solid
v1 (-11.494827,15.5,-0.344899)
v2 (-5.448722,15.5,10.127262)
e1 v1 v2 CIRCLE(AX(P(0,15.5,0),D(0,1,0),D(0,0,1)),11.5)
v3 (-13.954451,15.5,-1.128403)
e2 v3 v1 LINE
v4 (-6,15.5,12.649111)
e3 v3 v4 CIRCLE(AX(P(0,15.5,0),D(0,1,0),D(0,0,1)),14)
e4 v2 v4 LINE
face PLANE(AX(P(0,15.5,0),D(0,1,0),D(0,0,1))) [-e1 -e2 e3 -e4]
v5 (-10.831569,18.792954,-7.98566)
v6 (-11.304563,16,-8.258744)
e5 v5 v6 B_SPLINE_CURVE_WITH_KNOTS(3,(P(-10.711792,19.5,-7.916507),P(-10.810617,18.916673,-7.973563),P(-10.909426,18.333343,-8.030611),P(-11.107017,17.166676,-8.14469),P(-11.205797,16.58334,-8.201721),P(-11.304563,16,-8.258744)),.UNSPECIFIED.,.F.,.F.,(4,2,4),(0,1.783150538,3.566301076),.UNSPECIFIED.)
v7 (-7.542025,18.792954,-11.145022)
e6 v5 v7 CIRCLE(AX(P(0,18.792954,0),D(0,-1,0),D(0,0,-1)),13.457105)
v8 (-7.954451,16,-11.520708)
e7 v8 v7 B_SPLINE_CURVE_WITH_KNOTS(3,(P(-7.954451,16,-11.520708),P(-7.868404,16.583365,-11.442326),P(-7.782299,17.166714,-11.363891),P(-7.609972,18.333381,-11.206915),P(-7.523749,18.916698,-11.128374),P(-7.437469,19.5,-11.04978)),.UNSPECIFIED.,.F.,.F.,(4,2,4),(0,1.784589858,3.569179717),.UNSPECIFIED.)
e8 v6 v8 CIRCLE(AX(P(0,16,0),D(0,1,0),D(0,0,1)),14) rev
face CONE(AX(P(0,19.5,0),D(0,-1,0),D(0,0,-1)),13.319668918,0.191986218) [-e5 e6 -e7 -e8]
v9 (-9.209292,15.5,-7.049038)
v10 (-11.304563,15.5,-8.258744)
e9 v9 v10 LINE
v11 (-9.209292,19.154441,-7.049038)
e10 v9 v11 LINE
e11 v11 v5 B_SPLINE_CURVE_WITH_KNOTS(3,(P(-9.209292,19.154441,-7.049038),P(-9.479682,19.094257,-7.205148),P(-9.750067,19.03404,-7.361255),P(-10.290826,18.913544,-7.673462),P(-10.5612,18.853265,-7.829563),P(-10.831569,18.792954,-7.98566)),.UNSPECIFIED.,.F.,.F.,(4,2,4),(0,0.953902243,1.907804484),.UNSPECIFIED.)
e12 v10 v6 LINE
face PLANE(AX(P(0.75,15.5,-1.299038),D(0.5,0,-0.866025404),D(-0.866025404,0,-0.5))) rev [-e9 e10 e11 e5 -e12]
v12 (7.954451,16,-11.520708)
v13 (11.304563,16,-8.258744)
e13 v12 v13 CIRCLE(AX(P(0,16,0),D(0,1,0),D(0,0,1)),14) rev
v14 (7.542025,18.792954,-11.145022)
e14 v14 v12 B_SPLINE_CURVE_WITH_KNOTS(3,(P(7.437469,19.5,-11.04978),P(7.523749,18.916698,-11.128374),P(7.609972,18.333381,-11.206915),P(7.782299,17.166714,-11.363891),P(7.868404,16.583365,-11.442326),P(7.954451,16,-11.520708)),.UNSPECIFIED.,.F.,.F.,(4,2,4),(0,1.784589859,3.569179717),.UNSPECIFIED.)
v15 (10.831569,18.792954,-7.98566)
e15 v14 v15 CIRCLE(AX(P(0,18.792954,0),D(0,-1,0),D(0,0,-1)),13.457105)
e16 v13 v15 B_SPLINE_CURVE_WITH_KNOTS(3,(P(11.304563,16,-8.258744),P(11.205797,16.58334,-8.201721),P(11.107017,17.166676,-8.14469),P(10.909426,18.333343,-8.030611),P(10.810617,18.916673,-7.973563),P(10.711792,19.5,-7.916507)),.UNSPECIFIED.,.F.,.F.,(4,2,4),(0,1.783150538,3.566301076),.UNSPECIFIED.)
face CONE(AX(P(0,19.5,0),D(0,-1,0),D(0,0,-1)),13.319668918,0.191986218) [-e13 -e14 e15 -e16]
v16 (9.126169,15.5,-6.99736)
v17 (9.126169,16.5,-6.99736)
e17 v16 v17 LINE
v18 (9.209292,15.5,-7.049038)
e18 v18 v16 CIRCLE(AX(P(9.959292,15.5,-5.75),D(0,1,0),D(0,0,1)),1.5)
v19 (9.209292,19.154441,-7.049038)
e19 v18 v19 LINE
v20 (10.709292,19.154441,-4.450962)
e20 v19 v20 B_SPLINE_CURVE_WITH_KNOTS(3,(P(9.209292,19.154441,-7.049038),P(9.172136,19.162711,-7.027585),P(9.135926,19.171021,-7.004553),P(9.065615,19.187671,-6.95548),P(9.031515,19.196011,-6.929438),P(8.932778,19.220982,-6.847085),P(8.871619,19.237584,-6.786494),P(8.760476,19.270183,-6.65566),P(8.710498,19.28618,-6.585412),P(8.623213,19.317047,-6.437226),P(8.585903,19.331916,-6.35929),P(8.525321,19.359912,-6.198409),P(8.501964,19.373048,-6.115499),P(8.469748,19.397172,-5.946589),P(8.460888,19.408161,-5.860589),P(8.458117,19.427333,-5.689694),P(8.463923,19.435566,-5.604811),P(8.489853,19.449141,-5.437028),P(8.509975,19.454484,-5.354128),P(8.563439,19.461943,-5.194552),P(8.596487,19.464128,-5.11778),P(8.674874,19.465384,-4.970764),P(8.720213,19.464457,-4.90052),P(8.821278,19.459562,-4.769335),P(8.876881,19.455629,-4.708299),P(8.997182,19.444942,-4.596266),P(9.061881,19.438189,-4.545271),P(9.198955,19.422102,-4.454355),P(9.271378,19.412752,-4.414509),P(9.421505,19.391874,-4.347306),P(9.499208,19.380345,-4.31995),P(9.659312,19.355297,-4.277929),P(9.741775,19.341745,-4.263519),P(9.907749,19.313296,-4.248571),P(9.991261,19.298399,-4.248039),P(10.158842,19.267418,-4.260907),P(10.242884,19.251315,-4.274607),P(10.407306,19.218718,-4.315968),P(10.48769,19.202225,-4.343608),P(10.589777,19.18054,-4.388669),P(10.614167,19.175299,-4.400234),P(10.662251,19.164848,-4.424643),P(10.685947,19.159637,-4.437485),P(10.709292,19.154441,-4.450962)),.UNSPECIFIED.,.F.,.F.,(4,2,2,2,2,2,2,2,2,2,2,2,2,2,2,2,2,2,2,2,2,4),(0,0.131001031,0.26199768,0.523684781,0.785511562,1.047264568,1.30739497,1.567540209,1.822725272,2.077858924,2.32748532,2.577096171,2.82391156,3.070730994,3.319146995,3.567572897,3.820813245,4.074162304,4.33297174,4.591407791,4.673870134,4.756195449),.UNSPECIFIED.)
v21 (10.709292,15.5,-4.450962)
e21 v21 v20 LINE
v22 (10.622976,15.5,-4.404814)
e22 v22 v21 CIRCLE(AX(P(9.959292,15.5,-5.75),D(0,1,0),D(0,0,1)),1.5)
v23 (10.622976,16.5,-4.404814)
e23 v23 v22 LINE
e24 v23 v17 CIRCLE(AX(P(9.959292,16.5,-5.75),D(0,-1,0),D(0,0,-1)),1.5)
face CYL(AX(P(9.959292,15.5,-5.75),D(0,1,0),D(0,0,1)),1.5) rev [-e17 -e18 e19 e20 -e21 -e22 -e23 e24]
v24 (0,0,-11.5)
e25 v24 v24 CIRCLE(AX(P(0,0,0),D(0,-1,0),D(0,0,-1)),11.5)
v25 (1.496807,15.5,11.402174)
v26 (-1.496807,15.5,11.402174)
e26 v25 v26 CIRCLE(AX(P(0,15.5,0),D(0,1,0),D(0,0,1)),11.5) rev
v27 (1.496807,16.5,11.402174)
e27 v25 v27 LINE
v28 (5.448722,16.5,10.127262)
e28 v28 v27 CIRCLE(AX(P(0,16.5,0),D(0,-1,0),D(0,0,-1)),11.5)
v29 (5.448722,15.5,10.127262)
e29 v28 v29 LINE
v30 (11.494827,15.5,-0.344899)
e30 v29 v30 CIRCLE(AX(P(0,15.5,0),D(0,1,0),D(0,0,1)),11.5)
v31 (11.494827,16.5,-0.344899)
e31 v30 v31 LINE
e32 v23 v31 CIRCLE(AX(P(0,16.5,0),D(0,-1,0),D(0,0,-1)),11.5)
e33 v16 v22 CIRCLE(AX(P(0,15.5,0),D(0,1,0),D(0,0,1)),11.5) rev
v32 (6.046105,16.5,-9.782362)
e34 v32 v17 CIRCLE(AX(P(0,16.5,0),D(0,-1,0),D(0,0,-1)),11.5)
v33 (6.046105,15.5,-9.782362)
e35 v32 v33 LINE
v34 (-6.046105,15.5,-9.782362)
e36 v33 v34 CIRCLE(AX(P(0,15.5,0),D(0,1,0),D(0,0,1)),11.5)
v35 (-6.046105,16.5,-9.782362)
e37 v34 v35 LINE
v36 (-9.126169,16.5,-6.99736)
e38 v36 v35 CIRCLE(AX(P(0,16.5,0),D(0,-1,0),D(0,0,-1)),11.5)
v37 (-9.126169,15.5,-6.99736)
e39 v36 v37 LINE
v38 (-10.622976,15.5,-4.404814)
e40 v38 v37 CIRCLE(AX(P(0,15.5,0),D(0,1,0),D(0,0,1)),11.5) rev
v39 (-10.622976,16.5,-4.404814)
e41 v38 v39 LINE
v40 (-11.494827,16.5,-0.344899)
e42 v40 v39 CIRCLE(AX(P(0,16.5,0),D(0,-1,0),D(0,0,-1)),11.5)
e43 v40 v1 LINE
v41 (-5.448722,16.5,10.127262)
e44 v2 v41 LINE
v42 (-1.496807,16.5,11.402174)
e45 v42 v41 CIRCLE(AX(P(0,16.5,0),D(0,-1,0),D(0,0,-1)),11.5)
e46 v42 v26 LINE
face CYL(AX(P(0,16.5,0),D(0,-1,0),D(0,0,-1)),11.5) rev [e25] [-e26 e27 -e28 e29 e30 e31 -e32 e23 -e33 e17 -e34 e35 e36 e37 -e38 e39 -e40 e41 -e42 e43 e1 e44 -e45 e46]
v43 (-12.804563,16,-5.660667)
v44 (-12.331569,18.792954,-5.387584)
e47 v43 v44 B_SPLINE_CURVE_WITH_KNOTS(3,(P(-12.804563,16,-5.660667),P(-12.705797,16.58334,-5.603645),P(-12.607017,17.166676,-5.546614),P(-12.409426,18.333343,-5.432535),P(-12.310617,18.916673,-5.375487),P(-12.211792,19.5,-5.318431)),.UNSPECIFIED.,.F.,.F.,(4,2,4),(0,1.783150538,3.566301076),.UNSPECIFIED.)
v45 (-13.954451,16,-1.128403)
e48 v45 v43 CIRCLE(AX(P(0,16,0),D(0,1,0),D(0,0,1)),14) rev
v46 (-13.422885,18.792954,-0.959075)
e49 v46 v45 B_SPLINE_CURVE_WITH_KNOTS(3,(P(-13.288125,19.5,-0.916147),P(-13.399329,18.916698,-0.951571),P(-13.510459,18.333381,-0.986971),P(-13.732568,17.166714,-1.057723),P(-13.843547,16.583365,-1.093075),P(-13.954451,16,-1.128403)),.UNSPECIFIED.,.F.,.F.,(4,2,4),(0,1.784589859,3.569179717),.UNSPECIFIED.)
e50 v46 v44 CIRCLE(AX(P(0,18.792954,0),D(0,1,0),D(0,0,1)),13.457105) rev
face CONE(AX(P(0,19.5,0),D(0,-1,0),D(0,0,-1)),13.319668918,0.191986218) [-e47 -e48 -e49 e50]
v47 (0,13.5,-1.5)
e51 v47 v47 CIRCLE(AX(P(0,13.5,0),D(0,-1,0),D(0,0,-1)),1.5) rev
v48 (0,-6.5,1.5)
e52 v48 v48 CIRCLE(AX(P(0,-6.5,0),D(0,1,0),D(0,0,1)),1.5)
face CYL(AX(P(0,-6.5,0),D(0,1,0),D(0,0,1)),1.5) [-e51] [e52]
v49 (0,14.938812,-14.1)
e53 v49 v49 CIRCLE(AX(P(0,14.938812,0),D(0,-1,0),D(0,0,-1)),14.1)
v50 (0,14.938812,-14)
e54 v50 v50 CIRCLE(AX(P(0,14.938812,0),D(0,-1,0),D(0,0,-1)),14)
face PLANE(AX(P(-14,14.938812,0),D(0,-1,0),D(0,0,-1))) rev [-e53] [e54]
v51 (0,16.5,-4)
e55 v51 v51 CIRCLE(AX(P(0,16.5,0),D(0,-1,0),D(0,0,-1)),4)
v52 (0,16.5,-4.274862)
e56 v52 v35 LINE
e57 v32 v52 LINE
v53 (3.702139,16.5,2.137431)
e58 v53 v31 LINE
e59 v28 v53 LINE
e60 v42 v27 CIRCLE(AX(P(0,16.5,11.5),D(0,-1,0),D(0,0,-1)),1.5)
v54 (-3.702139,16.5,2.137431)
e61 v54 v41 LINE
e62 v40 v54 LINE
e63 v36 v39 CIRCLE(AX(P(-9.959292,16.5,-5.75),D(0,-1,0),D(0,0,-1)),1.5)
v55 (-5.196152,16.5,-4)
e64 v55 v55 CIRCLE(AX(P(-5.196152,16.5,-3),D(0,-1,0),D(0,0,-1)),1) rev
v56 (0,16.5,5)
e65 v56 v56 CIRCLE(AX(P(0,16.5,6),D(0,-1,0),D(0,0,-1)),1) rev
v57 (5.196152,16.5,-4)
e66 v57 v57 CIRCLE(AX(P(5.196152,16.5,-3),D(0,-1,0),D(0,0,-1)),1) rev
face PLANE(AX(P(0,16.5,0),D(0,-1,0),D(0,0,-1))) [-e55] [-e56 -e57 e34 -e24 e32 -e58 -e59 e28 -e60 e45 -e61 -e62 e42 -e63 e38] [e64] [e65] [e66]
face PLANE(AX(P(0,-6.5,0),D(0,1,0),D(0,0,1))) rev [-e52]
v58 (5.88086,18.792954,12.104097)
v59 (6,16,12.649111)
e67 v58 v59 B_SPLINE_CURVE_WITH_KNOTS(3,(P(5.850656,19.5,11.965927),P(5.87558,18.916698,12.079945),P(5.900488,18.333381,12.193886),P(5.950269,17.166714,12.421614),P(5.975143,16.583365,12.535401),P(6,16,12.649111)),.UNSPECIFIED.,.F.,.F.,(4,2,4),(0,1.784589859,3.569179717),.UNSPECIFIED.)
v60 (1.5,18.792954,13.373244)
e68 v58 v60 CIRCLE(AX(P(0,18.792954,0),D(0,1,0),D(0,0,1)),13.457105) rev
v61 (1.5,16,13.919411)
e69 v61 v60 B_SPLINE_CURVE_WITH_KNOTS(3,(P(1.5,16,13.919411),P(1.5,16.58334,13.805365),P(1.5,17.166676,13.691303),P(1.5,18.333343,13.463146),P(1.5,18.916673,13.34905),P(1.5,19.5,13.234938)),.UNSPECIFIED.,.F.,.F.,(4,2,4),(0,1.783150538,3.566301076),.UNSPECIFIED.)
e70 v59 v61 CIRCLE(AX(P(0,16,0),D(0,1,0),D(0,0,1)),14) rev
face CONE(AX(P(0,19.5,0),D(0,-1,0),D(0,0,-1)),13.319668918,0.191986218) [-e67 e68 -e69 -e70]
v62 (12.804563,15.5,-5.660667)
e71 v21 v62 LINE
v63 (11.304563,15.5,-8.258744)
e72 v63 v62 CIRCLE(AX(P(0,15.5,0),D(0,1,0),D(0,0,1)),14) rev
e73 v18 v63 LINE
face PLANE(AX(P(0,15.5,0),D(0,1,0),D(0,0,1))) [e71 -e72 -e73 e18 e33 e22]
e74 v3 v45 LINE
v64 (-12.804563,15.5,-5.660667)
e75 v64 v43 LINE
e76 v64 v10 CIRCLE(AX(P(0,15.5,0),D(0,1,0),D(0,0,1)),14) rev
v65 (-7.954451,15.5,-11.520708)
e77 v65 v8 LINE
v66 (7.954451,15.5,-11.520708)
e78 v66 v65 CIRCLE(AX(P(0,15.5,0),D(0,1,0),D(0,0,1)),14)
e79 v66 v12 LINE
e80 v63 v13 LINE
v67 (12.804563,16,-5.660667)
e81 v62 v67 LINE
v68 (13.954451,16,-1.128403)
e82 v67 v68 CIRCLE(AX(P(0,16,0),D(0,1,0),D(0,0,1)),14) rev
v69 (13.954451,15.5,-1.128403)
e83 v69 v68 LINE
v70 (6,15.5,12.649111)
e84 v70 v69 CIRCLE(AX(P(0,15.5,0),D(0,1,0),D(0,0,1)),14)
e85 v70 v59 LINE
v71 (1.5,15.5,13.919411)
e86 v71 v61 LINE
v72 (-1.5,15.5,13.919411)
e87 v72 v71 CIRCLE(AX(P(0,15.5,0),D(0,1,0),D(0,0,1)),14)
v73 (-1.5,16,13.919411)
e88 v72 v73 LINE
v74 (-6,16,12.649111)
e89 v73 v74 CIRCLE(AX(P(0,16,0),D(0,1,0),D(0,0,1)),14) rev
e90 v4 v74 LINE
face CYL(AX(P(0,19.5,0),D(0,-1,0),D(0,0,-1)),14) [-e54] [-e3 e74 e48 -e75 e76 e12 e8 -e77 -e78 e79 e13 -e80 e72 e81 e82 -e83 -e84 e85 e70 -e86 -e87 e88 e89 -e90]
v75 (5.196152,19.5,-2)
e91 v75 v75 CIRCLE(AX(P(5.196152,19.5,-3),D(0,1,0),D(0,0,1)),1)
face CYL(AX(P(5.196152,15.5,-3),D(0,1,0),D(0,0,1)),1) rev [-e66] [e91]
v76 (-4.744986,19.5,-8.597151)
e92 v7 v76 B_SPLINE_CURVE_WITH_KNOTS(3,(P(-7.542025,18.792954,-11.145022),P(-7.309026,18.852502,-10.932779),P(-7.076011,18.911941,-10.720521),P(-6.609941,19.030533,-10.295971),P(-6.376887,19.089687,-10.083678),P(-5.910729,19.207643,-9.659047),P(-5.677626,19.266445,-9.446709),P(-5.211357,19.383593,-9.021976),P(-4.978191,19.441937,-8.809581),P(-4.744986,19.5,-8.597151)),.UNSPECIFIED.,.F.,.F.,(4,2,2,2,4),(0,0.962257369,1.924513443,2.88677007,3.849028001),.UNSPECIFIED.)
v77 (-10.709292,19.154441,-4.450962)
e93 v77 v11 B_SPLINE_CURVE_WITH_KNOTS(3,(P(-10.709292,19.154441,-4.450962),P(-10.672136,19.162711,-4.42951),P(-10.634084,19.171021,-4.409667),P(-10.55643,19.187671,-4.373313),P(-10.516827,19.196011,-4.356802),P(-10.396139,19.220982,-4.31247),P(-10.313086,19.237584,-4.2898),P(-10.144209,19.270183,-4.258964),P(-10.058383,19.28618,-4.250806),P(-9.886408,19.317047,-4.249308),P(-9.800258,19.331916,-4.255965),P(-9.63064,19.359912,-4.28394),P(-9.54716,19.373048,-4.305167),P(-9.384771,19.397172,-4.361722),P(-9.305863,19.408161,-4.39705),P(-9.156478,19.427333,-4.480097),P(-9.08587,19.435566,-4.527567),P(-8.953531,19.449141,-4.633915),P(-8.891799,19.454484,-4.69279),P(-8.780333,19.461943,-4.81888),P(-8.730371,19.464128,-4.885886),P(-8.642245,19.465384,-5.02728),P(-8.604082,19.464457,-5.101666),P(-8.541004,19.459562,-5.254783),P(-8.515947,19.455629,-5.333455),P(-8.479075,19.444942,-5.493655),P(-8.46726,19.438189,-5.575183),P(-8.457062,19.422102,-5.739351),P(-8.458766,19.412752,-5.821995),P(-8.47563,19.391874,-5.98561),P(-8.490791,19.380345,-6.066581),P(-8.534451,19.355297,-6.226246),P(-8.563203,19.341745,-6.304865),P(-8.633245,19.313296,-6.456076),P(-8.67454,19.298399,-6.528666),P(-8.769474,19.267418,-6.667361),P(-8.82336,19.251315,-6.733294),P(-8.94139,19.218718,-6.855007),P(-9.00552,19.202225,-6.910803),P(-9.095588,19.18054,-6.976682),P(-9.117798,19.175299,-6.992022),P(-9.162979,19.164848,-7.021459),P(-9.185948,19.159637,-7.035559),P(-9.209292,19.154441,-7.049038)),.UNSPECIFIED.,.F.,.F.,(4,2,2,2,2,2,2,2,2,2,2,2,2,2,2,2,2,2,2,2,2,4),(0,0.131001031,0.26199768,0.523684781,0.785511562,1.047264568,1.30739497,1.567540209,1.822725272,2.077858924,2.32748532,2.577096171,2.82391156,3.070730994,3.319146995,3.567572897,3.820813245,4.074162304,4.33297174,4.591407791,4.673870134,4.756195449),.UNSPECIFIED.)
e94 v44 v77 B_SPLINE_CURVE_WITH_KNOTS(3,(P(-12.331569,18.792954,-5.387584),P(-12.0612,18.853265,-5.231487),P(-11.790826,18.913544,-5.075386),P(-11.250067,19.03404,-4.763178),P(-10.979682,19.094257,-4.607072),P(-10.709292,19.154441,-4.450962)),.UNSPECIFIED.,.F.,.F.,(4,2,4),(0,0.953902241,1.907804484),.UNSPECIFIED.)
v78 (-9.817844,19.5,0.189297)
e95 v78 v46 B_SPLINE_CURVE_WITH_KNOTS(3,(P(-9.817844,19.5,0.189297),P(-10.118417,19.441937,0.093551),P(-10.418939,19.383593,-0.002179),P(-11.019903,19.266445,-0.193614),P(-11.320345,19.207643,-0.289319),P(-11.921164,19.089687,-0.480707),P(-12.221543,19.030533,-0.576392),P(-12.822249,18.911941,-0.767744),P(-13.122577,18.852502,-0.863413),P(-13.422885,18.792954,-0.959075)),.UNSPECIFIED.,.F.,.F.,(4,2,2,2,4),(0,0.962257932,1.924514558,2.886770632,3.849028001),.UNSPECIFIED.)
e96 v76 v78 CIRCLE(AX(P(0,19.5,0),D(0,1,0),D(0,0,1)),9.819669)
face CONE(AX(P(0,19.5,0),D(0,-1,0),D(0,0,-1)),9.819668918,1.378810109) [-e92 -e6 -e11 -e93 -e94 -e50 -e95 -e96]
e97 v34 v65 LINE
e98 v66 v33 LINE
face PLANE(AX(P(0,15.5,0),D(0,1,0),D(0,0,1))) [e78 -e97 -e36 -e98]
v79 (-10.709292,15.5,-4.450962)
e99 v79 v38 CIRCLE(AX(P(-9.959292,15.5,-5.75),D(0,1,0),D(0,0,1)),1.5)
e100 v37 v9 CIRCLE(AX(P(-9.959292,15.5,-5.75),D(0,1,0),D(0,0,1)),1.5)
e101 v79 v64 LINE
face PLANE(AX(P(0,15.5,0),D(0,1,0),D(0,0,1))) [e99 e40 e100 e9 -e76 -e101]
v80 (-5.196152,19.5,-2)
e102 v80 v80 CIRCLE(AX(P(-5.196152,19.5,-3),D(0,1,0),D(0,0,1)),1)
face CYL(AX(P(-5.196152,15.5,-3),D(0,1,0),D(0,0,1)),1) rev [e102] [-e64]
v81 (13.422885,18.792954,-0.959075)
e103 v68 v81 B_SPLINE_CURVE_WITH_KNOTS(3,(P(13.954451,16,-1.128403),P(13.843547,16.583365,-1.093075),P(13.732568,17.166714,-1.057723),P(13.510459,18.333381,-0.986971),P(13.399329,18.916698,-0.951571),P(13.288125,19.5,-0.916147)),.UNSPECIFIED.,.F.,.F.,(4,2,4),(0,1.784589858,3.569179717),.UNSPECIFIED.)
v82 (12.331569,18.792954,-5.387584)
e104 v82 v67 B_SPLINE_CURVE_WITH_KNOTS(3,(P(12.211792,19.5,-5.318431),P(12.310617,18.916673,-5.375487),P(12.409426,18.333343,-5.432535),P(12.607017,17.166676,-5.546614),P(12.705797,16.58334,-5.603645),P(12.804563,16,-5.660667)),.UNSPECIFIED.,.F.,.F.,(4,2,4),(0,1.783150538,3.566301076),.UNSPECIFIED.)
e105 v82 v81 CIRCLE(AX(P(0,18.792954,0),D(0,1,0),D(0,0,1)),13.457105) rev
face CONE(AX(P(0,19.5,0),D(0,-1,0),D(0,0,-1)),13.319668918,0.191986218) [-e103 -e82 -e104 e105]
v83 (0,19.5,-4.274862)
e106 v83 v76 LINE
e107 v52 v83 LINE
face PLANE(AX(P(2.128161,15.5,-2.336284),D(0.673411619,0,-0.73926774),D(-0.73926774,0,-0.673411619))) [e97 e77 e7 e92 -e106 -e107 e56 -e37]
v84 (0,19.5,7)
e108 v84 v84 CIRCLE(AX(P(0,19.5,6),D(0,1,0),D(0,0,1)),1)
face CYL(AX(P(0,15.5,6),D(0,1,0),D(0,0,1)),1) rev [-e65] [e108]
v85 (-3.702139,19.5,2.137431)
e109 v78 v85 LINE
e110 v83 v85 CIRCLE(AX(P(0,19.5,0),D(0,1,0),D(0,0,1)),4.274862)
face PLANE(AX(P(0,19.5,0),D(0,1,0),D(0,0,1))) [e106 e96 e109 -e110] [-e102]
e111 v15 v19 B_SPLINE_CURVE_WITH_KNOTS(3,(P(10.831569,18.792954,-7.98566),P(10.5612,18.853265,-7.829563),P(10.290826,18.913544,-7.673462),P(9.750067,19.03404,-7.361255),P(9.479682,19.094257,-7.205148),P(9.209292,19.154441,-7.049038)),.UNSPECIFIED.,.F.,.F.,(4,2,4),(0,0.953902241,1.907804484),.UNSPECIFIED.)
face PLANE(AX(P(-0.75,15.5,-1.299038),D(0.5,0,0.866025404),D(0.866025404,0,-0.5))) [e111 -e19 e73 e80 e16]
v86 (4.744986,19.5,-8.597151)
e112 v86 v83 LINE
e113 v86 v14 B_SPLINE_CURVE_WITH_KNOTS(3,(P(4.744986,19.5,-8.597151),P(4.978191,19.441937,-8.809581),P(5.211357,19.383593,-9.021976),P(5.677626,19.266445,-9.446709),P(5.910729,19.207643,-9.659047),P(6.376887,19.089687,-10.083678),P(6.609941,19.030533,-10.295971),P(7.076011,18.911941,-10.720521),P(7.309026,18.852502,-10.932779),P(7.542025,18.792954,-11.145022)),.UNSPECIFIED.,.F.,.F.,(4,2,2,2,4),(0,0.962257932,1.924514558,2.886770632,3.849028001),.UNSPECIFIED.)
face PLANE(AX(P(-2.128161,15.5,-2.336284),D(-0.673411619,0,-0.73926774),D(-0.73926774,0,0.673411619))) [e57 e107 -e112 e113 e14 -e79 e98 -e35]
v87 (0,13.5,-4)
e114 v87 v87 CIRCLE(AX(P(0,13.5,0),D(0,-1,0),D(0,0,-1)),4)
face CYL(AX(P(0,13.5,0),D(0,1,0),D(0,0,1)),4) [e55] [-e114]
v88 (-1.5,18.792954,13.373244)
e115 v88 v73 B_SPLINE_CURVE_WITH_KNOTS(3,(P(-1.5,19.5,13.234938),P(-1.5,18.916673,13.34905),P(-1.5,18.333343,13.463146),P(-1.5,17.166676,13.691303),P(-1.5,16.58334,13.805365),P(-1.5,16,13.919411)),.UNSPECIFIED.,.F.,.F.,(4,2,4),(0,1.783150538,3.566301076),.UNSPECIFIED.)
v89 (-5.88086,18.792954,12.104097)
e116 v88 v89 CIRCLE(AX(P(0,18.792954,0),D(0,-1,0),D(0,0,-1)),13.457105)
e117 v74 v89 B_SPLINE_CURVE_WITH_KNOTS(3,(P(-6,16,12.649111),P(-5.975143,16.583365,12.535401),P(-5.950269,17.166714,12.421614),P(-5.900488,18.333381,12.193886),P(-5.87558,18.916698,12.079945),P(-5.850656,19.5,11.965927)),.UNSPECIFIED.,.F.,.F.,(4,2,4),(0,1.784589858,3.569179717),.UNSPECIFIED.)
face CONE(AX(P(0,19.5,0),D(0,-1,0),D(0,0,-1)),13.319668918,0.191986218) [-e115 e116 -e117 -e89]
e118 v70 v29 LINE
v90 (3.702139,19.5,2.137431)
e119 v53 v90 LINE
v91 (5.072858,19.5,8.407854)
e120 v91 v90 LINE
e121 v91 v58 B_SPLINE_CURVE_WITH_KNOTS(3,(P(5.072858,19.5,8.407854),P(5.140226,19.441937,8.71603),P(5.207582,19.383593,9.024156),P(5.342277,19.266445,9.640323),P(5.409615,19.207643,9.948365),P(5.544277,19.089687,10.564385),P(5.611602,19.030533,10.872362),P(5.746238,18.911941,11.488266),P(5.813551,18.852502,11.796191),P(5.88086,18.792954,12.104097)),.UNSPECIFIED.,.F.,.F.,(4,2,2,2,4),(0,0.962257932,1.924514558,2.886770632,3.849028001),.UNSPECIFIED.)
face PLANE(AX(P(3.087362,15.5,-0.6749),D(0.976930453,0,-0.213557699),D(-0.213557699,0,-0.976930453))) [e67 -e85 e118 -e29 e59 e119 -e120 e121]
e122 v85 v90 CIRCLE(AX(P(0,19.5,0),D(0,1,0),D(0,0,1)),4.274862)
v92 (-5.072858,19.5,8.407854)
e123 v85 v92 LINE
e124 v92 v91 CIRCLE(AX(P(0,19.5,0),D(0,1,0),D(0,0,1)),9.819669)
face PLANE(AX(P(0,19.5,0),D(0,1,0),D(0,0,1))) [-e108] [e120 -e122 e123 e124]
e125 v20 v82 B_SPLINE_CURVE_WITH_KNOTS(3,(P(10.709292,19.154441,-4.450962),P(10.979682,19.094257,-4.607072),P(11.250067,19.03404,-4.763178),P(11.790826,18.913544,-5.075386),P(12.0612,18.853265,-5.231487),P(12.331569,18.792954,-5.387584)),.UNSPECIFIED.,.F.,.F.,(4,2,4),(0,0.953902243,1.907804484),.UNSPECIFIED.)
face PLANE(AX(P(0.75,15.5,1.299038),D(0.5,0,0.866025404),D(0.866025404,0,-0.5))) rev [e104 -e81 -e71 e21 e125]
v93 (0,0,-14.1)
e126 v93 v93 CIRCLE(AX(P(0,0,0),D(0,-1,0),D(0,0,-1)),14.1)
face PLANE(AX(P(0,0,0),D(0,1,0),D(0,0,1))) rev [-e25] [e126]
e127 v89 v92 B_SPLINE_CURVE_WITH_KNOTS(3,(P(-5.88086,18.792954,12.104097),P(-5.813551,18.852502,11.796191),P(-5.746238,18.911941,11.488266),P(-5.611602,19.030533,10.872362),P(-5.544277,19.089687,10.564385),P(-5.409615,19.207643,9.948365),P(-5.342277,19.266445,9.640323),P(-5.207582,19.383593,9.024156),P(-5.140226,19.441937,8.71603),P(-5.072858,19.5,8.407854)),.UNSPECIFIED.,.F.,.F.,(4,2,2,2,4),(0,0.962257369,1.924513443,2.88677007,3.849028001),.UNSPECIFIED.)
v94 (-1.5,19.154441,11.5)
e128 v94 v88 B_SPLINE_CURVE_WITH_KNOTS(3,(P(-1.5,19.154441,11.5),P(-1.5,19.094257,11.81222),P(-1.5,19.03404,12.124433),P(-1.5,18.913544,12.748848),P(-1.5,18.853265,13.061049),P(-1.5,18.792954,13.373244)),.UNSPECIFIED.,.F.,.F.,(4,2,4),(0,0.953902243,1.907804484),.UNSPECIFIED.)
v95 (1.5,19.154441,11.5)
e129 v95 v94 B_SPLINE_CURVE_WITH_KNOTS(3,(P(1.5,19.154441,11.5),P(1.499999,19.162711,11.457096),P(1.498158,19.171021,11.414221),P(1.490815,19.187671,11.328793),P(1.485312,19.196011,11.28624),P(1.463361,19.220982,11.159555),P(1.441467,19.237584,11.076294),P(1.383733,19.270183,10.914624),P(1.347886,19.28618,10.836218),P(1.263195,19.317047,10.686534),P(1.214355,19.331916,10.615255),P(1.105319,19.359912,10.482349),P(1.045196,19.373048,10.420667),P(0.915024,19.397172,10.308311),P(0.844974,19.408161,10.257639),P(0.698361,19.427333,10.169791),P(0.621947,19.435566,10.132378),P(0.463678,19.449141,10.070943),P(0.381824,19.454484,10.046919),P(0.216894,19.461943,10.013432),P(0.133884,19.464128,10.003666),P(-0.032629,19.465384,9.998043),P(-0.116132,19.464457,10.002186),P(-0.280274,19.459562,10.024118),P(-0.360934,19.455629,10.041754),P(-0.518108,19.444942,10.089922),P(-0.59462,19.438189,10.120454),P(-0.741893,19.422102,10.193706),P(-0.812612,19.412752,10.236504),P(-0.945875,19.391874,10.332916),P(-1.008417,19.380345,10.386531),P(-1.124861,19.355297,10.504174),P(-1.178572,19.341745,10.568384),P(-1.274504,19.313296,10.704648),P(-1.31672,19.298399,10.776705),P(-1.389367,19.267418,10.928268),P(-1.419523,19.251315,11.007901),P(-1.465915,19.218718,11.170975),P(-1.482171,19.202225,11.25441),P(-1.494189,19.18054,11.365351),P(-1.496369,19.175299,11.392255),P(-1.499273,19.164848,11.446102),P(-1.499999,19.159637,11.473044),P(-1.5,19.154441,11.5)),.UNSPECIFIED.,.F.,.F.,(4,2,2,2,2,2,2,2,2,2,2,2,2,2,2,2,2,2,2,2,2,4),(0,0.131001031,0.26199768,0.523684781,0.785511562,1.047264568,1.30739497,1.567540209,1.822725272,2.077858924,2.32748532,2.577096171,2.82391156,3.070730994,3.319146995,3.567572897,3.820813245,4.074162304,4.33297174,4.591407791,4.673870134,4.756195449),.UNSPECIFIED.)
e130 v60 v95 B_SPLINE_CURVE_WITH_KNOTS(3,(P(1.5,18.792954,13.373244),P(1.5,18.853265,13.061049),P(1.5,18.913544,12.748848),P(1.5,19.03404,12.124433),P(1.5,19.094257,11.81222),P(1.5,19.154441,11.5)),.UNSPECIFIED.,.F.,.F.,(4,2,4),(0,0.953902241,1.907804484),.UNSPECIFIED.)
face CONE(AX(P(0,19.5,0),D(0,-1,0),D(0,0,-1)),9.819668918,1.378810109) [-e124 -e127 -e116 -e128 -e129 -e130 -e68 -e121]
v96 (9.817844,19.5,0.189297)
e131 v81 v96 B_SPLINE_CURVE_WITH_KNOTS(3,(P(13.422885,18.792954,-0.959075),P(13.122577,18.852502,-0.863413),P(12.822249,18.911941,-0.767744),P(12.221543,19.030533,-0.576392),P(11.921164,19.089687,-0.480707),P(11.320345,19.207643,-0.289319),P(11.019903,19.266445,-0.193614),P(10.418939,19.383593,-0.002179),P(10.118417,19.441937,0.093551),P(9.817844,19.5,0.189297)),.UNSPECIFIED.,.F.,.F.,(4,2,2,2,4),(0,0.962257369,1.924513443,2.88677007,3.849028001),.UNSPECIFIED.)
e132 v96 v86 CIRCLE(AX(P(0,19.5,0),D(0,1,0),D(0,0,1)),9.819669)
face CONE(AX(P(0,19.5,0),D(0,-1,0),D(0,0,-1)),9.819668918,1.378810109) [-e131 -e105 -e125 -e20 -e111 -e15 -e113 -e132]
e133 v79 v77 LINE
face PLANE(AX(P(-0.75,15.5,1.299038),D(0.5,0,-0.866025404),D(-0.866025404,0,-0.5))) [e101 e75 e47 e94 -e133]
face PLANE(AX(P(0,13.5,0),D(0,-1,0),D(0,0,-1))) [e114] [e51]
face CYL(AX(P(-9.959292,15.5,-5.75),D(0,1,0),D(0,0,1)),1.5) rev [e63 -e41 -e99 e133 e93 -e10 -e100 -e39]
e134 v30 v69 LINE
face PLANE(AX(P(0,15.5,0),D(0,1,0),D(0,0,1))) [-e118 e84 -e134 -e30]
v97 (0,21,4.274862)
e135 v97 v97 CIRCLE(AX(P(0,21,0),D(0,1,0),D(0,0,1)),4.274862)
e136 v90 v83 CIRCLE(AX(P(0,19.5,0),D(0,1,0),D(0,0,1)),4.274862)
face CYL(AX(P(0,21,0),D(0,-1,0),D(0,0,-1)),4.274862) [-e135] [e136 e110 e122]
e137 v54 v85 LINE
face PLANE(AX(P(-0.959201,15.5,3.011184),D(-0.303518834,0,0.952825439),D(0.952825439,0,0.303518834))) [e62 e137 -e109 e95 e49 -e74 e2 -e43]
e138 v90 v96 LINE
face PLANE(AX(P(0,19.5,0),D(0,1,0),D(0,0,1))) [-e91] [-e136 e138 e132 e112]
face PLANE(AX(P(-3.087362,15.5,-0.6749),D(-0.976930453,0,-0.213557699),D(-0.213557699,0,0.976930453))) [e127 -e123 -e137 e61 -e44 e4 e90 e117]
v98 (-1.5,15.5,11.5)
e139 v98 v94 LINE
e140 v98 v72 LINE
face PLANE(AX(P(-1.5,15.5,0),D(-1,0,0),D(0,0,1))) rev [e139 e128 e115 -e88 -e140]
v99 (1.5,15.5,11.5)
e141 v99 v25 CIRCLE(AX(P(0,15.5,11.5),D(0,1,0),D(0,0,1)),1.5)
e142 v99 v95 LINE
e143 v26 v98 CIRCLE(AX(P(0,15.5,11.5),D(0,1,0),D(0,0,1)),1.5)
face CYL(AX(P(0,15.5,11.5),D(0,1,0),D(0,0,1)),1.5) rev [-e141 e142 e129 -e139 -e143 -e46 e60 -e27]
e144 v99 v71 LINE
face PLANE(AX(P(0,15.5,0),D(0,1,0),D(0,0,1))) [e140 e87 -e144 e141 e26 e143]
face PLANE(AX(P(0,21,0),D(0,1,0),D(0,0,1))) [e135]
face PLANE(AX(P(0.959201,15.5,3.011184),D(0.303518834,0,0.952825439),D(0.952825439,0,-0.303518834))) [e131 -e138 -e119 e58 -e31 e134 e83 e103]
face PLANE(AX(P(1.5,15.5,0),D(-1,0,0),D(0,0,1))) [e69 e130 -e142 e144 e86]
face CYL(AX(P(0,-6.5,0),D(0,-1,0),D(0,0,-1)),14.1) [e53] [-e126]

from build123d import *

# Parameters (mm, degrees)
SCHIZZO1_R                   = 14
ESTRUSIONE_ESTRUSIONE1_DEPTH = 19.5
TAGLIO_ESTRUSIONE1_START     = -4
SCHIZZO2_R                   = 1
TAGLIO_ESTRUSIONE1_DEPTH     = 4
SCHIZZO3_R                   = 4.27486225
ESTRUSIONE_ESTRUSIONE2_DEPTH = 1.5
SCHIZZO4_R                   = 11.5
TAGLIO_ESTRUSIONE2_DEPTH     = 16.5
SCHIZZO5_R                   = 1.5
TAGLIO_ESTRUSIONE3_DEPTH     = 16.5
TAGLIO_ESTRUSIONE4_START     = -4
TAGLIO_ESTRUSIONE4_DEPTH     = 4
SCHIZZO7_R                   = 1.5
ESTRUSIONE_ESTRUSIONE3_DEPTH = 27.5
SCHIZZO8_R                   = 4
ESTRUSIONE_ESTRUSIONE4_DEPTH = 3
SCHIZZO9_W                   = 0.1
SCHIZZO9_H                   = 14.938811625
SMUSSO1_SIZE                 = 3.5
SMUSSO1_SIZE2                = 0.680331082
SMUSSO2_SIZE                 = 0.720279458
SMUSSO2_SIZE_2               = 3.5


with BuildPart() as part:
    # Schizzo1 → Estrusione-Estrusione1 (new body)
    with BuildSketch(Plane(origin=(0, 0, 0), x_dir=(1, 0, 0), z_dir=(0, 1, 0))):
        with Locations(Location((0, 0, 0), (0, 0, 270))):
            Circle(SCHIZZO1_R)
    extrude(amount=ESTRUSIONE_ESTRUSIONE1_DEPTH)

    # Schizzo2 → Taglio-Estrusione1 (cut)
    with BuildSketch(Plane(origin=(0, 19.5, 0), x_dir=(1, 0, 0), z_dir=(0, 1, 0)).offset(TAGLIO_ESTRUSIONE1_START)):
        with BuildLine():
            Line((-7.95445115, 11.520707743), (0, 4.27486225))
            Line((0, 4.27486225), (7.95445115, 11.520707743))
            ThreePointArc((7.95445115, 11.520707743), (0, 14), (-7.95445115, 11.520707743))
        make_face()
        with BuildLine():
            ThreePointArc((14, 0), (13.988608153, 0.564660915), (13.95445115, 1.128402898))
            Line((13.95445115, 1.128402898), (3.702139306, -2.137431125))
            Line((3.702139306, -2.137431125), (6, -12.649110641))
            ThreePointArc((6, -12.649110641), (11.832159566, -7.483314774), (14, 0))
        make_face()
        with BuildLine():
            Line((-3.702139306, -2.137431125), (-13.95445115, 1.128402898))
            ThreePointArc((-13.95445115, 1.128402898), (-12.124355653, -7), (-6, -12.649110641))
            Line((-6, -12.649110641), (-3.702139306, -2.137431125))
        make_face()
        with Locations(Location((0, -6, 0), (0, 0, 270))):
            Circle(SCHIZZO2_R)
        with Locations(Location((-5.196152423, 3, 0), (0, 0, 270))):
            Circle(SCHIZZO2_R)
        with Locations(Location((5.196152423, 3, 0), (0, 0, 270))):
            Circle(SCHIZZO2_R)
    extrude(amount=TAGLIO_ESTRUSIONE1_DEPTH, mode=Mode.SUBTRACT)

    # Schizzo3 → Estrusione-Estrusione2 (add)
    with BuildSketch(Plane(origin=(0, 19.5, 0), x_dir=(1, 0, 0), z_dir=(0, 1, 0))):
        with Locations(Location((0, 0, 0), (0, 0, 90))):
            Circle(SCHIZZO3_R)
    extrude(amount=ESTRUSIONE_ESTRUSIONE2_DEPTH)

    # Schizzo4 → Taglio-Estrusione2 (cut)
    with BuildSketch(Plane.XZ):
        with Locations(Location((0, 0, 0), (0, 0, 270))):
            Circle(SCHIZZO4_R)
    extrude(amount=-TAGLIO_ESTRUSIONE2_DEPTH, mode=Mode.SUBTRACT)

    # Schizzo5 → Taglio-Estrusione3 (cut)
    with BuildSketch(Plane(origin=(0, 21, 0), x_dir=(1, 0, 0), z_dir=(0, 1, 0))):
        with Locations(Location((0, 0, 0), (0, 0, 270))):
            Circle(SCHIZZO5_R)
    extrude(amount=-TAGLIO_ESTRUSIONE3_DEPTH, mode=Mode.SUBTRACT)

    # Schizzo6 → Taglio-Estrusione4 (cut)
    with BuildSketch(Plane(origin=(0, 19.5, 0), x_dir=(1, 0, 0), z_dir=(0, 1, 0)).offset(TAGLIO_ESTRUSIONE4_START)):
        with BuildLine():
            Line((1.5, -13.919410907), (1.5, -11.5))
            ThreePointArc((1.5, -11.5), (0, -10), (-1.5, -11.5))
            Line((-1.5, -11.5), (-1.5, -13.919410907))
            ThreePointArc((-1.5, -13.919410907), (0, -14), (1.5, -13.919410907))
        make_face()
        with BuildLine():
            ThreePointArc((9.209292144, 7.049038106), (8.660254038, 5), (10.709292144, 4.450961894))
            Line((10.709292144, 4.450961894), (12.804563451, 5.660667348))
            ThreePointArc((12.804563451, 5.660667348), (12.124355653, 7), (11.304563451, 8.258743559))
            Line((11.304563451, 8.258743559), (9.209292144, 7.049038106))
        make_face()
        with BuildLine():
            ThreePointArc((-10.709292144, 4.450961894), (-8.660254038, 5), (-9.209292144, 7.049038106))
            Line((-9.209292144, 7.049038106), (-11.304563451, 8.258743559))
            ThreePointArc((-11.304563451, 8.258743559), (-12.124355653, 7), (-12.804563451, 5.660667348))
            Line((-12.804563451, 5.660667348), (-10.709292144, 4.450961894))
        make_face()
    extrude(amount=TAGLIO_ESTRUSIONE4_DEPTH, mode=Mode.SUBTRACT)

    # Schizzo7 → Estrusione-Estrusione3 (add)
    with BuildSketch(Plane(origin=(0, 21, 0), x_dir=(1, 0, 0), z_dir=(0, 1, 0))):
        with Locations(Location((0, 0, 0), (0, 0, 270))):
            Circle(SCHIZZO7_R)
    extrude(amount=-ESTRUSIONE_ESTRUSIONE3_DEPTH)

    # Schizzo8 → Estrusione-Estrusione4 (add)
    with BuildSketch(Plane.XZ.offset(-16.5)):
        with Locations(Location((0, 0, 0), (0, 0, 270))):
            Circle(SCHIZZO8_R)
    extrude(amount=ESTRUSIONE_ESTRUSIONE4_DEPTH)

    # Schizzo9 → Rivoluzione1 (revolve)
    with BuildSketch(Plane.XY, mode=Mode.PRIVATE) as rivoluzione1_sk:
        with Locations((-14.05, 7.469405813)):
            Rectangle(SCHIZZO9_W, SCHIZZO9_H)
    revolve(rivoluzione1_sk.sketch.rotate(Axis((0, -6.5, 0), (0, 1, 0)), 270), axis=Axis((0, -6.5, 0), (0, 1, 0)))

    # Smusso1
    smusso1_edges = [part.edges().sort_by_distance(p)[0] for p in [
        (9.766653134, 19.5, -10.030577579),
        (-13.570061565, 19.5, -3.442880935),
        (13.570061565, 19.5, -3.442880935),
        (-3.803408431, 19.5, 13.473458513),
        (-9.766653134, 19.5, -10.030577579),
        (3.803408431, 19.5, 13.473458513),
    ]]
    smusso1_side = [part.faces().sort_by_distance(p)[0] for p in [
        (0, 17.219405813, -14),
    ]]
    chamfer(smusso1_edges, length=SMUSSO1_SIZE, length2=SMUSSO1_SIZE2, reference=smusso1_side[0])

    # Smusso2
    # the kernel refuses this chamfer: 3.5, 0.720279458 mm, written as the material it takes off along each edge
    with BuildSketch(Plane(origin=(0, 19.5, 0), x_dir=(-0.4593857913267627, 0, -0.8882368460760249), z_dir=(0.8882368460760249, 0, -0.4593857913267627))) as smusso2_piece_1:
        Polygon((13.319668918 + SMUSSO2_SIZE * 0.190808995258, -SMUSSO2_SIZE * 0.981627182836), (13.319668918 - SMUSSO2_SIZE_2, 0), (13.319668918, 0), align=None)
    revolve(axis=Axis((0, 19.5, 0), (0, 1, 0)), revolution_arc=97.827137871, mode=Mode.SUBTRACT)
    with BuildSketch(Plane(origin=(0, 19.5, 0), x_dir=(-0.5395427776158211, 0, 0.8419581884646081), z_dir=(-0.8419581884646081, 0, -0.5395427776158211))) as smusso2_piece_2:
        Polygon((13.319668918 + SMUSSO2_SIZE * 0.190808995258, -SMUSSO2_SIZE * 0.981627182836), (13.319668918 - SMUSSO2_SIZE_2, 0), (13.319668918, 0), align=None)
    revolve(axis=Axis((0, 19.5, 0), (0, 1, 0)), revolution_arc=97.827137871, mode=Mode.SUBTRACT)
    with BuildSketch(Plane(origin=(0, 19.5, 0), x_dir=(0.8174001702166583, 0, 0.5760702749923641), z_dir=(-0.5760702749923641, 0, 0.8174001702166583))) as smusso2_piece_3:
        Polygon((13.319668918 + SMUSSO2_SIZE * 0.190808995258, -SMUSSO2_SIZE * 0.981627182836), (13.319668918 - SMUSSO2_SIZE_2, 0), (13.319668918, 0), align=None)
    revolve(axis=Axis((0, 19.5, 0), (0, 1, 0)), revolution_arc=97.827137871, mode=Mode.SUBTRACT)


solid = part.part
